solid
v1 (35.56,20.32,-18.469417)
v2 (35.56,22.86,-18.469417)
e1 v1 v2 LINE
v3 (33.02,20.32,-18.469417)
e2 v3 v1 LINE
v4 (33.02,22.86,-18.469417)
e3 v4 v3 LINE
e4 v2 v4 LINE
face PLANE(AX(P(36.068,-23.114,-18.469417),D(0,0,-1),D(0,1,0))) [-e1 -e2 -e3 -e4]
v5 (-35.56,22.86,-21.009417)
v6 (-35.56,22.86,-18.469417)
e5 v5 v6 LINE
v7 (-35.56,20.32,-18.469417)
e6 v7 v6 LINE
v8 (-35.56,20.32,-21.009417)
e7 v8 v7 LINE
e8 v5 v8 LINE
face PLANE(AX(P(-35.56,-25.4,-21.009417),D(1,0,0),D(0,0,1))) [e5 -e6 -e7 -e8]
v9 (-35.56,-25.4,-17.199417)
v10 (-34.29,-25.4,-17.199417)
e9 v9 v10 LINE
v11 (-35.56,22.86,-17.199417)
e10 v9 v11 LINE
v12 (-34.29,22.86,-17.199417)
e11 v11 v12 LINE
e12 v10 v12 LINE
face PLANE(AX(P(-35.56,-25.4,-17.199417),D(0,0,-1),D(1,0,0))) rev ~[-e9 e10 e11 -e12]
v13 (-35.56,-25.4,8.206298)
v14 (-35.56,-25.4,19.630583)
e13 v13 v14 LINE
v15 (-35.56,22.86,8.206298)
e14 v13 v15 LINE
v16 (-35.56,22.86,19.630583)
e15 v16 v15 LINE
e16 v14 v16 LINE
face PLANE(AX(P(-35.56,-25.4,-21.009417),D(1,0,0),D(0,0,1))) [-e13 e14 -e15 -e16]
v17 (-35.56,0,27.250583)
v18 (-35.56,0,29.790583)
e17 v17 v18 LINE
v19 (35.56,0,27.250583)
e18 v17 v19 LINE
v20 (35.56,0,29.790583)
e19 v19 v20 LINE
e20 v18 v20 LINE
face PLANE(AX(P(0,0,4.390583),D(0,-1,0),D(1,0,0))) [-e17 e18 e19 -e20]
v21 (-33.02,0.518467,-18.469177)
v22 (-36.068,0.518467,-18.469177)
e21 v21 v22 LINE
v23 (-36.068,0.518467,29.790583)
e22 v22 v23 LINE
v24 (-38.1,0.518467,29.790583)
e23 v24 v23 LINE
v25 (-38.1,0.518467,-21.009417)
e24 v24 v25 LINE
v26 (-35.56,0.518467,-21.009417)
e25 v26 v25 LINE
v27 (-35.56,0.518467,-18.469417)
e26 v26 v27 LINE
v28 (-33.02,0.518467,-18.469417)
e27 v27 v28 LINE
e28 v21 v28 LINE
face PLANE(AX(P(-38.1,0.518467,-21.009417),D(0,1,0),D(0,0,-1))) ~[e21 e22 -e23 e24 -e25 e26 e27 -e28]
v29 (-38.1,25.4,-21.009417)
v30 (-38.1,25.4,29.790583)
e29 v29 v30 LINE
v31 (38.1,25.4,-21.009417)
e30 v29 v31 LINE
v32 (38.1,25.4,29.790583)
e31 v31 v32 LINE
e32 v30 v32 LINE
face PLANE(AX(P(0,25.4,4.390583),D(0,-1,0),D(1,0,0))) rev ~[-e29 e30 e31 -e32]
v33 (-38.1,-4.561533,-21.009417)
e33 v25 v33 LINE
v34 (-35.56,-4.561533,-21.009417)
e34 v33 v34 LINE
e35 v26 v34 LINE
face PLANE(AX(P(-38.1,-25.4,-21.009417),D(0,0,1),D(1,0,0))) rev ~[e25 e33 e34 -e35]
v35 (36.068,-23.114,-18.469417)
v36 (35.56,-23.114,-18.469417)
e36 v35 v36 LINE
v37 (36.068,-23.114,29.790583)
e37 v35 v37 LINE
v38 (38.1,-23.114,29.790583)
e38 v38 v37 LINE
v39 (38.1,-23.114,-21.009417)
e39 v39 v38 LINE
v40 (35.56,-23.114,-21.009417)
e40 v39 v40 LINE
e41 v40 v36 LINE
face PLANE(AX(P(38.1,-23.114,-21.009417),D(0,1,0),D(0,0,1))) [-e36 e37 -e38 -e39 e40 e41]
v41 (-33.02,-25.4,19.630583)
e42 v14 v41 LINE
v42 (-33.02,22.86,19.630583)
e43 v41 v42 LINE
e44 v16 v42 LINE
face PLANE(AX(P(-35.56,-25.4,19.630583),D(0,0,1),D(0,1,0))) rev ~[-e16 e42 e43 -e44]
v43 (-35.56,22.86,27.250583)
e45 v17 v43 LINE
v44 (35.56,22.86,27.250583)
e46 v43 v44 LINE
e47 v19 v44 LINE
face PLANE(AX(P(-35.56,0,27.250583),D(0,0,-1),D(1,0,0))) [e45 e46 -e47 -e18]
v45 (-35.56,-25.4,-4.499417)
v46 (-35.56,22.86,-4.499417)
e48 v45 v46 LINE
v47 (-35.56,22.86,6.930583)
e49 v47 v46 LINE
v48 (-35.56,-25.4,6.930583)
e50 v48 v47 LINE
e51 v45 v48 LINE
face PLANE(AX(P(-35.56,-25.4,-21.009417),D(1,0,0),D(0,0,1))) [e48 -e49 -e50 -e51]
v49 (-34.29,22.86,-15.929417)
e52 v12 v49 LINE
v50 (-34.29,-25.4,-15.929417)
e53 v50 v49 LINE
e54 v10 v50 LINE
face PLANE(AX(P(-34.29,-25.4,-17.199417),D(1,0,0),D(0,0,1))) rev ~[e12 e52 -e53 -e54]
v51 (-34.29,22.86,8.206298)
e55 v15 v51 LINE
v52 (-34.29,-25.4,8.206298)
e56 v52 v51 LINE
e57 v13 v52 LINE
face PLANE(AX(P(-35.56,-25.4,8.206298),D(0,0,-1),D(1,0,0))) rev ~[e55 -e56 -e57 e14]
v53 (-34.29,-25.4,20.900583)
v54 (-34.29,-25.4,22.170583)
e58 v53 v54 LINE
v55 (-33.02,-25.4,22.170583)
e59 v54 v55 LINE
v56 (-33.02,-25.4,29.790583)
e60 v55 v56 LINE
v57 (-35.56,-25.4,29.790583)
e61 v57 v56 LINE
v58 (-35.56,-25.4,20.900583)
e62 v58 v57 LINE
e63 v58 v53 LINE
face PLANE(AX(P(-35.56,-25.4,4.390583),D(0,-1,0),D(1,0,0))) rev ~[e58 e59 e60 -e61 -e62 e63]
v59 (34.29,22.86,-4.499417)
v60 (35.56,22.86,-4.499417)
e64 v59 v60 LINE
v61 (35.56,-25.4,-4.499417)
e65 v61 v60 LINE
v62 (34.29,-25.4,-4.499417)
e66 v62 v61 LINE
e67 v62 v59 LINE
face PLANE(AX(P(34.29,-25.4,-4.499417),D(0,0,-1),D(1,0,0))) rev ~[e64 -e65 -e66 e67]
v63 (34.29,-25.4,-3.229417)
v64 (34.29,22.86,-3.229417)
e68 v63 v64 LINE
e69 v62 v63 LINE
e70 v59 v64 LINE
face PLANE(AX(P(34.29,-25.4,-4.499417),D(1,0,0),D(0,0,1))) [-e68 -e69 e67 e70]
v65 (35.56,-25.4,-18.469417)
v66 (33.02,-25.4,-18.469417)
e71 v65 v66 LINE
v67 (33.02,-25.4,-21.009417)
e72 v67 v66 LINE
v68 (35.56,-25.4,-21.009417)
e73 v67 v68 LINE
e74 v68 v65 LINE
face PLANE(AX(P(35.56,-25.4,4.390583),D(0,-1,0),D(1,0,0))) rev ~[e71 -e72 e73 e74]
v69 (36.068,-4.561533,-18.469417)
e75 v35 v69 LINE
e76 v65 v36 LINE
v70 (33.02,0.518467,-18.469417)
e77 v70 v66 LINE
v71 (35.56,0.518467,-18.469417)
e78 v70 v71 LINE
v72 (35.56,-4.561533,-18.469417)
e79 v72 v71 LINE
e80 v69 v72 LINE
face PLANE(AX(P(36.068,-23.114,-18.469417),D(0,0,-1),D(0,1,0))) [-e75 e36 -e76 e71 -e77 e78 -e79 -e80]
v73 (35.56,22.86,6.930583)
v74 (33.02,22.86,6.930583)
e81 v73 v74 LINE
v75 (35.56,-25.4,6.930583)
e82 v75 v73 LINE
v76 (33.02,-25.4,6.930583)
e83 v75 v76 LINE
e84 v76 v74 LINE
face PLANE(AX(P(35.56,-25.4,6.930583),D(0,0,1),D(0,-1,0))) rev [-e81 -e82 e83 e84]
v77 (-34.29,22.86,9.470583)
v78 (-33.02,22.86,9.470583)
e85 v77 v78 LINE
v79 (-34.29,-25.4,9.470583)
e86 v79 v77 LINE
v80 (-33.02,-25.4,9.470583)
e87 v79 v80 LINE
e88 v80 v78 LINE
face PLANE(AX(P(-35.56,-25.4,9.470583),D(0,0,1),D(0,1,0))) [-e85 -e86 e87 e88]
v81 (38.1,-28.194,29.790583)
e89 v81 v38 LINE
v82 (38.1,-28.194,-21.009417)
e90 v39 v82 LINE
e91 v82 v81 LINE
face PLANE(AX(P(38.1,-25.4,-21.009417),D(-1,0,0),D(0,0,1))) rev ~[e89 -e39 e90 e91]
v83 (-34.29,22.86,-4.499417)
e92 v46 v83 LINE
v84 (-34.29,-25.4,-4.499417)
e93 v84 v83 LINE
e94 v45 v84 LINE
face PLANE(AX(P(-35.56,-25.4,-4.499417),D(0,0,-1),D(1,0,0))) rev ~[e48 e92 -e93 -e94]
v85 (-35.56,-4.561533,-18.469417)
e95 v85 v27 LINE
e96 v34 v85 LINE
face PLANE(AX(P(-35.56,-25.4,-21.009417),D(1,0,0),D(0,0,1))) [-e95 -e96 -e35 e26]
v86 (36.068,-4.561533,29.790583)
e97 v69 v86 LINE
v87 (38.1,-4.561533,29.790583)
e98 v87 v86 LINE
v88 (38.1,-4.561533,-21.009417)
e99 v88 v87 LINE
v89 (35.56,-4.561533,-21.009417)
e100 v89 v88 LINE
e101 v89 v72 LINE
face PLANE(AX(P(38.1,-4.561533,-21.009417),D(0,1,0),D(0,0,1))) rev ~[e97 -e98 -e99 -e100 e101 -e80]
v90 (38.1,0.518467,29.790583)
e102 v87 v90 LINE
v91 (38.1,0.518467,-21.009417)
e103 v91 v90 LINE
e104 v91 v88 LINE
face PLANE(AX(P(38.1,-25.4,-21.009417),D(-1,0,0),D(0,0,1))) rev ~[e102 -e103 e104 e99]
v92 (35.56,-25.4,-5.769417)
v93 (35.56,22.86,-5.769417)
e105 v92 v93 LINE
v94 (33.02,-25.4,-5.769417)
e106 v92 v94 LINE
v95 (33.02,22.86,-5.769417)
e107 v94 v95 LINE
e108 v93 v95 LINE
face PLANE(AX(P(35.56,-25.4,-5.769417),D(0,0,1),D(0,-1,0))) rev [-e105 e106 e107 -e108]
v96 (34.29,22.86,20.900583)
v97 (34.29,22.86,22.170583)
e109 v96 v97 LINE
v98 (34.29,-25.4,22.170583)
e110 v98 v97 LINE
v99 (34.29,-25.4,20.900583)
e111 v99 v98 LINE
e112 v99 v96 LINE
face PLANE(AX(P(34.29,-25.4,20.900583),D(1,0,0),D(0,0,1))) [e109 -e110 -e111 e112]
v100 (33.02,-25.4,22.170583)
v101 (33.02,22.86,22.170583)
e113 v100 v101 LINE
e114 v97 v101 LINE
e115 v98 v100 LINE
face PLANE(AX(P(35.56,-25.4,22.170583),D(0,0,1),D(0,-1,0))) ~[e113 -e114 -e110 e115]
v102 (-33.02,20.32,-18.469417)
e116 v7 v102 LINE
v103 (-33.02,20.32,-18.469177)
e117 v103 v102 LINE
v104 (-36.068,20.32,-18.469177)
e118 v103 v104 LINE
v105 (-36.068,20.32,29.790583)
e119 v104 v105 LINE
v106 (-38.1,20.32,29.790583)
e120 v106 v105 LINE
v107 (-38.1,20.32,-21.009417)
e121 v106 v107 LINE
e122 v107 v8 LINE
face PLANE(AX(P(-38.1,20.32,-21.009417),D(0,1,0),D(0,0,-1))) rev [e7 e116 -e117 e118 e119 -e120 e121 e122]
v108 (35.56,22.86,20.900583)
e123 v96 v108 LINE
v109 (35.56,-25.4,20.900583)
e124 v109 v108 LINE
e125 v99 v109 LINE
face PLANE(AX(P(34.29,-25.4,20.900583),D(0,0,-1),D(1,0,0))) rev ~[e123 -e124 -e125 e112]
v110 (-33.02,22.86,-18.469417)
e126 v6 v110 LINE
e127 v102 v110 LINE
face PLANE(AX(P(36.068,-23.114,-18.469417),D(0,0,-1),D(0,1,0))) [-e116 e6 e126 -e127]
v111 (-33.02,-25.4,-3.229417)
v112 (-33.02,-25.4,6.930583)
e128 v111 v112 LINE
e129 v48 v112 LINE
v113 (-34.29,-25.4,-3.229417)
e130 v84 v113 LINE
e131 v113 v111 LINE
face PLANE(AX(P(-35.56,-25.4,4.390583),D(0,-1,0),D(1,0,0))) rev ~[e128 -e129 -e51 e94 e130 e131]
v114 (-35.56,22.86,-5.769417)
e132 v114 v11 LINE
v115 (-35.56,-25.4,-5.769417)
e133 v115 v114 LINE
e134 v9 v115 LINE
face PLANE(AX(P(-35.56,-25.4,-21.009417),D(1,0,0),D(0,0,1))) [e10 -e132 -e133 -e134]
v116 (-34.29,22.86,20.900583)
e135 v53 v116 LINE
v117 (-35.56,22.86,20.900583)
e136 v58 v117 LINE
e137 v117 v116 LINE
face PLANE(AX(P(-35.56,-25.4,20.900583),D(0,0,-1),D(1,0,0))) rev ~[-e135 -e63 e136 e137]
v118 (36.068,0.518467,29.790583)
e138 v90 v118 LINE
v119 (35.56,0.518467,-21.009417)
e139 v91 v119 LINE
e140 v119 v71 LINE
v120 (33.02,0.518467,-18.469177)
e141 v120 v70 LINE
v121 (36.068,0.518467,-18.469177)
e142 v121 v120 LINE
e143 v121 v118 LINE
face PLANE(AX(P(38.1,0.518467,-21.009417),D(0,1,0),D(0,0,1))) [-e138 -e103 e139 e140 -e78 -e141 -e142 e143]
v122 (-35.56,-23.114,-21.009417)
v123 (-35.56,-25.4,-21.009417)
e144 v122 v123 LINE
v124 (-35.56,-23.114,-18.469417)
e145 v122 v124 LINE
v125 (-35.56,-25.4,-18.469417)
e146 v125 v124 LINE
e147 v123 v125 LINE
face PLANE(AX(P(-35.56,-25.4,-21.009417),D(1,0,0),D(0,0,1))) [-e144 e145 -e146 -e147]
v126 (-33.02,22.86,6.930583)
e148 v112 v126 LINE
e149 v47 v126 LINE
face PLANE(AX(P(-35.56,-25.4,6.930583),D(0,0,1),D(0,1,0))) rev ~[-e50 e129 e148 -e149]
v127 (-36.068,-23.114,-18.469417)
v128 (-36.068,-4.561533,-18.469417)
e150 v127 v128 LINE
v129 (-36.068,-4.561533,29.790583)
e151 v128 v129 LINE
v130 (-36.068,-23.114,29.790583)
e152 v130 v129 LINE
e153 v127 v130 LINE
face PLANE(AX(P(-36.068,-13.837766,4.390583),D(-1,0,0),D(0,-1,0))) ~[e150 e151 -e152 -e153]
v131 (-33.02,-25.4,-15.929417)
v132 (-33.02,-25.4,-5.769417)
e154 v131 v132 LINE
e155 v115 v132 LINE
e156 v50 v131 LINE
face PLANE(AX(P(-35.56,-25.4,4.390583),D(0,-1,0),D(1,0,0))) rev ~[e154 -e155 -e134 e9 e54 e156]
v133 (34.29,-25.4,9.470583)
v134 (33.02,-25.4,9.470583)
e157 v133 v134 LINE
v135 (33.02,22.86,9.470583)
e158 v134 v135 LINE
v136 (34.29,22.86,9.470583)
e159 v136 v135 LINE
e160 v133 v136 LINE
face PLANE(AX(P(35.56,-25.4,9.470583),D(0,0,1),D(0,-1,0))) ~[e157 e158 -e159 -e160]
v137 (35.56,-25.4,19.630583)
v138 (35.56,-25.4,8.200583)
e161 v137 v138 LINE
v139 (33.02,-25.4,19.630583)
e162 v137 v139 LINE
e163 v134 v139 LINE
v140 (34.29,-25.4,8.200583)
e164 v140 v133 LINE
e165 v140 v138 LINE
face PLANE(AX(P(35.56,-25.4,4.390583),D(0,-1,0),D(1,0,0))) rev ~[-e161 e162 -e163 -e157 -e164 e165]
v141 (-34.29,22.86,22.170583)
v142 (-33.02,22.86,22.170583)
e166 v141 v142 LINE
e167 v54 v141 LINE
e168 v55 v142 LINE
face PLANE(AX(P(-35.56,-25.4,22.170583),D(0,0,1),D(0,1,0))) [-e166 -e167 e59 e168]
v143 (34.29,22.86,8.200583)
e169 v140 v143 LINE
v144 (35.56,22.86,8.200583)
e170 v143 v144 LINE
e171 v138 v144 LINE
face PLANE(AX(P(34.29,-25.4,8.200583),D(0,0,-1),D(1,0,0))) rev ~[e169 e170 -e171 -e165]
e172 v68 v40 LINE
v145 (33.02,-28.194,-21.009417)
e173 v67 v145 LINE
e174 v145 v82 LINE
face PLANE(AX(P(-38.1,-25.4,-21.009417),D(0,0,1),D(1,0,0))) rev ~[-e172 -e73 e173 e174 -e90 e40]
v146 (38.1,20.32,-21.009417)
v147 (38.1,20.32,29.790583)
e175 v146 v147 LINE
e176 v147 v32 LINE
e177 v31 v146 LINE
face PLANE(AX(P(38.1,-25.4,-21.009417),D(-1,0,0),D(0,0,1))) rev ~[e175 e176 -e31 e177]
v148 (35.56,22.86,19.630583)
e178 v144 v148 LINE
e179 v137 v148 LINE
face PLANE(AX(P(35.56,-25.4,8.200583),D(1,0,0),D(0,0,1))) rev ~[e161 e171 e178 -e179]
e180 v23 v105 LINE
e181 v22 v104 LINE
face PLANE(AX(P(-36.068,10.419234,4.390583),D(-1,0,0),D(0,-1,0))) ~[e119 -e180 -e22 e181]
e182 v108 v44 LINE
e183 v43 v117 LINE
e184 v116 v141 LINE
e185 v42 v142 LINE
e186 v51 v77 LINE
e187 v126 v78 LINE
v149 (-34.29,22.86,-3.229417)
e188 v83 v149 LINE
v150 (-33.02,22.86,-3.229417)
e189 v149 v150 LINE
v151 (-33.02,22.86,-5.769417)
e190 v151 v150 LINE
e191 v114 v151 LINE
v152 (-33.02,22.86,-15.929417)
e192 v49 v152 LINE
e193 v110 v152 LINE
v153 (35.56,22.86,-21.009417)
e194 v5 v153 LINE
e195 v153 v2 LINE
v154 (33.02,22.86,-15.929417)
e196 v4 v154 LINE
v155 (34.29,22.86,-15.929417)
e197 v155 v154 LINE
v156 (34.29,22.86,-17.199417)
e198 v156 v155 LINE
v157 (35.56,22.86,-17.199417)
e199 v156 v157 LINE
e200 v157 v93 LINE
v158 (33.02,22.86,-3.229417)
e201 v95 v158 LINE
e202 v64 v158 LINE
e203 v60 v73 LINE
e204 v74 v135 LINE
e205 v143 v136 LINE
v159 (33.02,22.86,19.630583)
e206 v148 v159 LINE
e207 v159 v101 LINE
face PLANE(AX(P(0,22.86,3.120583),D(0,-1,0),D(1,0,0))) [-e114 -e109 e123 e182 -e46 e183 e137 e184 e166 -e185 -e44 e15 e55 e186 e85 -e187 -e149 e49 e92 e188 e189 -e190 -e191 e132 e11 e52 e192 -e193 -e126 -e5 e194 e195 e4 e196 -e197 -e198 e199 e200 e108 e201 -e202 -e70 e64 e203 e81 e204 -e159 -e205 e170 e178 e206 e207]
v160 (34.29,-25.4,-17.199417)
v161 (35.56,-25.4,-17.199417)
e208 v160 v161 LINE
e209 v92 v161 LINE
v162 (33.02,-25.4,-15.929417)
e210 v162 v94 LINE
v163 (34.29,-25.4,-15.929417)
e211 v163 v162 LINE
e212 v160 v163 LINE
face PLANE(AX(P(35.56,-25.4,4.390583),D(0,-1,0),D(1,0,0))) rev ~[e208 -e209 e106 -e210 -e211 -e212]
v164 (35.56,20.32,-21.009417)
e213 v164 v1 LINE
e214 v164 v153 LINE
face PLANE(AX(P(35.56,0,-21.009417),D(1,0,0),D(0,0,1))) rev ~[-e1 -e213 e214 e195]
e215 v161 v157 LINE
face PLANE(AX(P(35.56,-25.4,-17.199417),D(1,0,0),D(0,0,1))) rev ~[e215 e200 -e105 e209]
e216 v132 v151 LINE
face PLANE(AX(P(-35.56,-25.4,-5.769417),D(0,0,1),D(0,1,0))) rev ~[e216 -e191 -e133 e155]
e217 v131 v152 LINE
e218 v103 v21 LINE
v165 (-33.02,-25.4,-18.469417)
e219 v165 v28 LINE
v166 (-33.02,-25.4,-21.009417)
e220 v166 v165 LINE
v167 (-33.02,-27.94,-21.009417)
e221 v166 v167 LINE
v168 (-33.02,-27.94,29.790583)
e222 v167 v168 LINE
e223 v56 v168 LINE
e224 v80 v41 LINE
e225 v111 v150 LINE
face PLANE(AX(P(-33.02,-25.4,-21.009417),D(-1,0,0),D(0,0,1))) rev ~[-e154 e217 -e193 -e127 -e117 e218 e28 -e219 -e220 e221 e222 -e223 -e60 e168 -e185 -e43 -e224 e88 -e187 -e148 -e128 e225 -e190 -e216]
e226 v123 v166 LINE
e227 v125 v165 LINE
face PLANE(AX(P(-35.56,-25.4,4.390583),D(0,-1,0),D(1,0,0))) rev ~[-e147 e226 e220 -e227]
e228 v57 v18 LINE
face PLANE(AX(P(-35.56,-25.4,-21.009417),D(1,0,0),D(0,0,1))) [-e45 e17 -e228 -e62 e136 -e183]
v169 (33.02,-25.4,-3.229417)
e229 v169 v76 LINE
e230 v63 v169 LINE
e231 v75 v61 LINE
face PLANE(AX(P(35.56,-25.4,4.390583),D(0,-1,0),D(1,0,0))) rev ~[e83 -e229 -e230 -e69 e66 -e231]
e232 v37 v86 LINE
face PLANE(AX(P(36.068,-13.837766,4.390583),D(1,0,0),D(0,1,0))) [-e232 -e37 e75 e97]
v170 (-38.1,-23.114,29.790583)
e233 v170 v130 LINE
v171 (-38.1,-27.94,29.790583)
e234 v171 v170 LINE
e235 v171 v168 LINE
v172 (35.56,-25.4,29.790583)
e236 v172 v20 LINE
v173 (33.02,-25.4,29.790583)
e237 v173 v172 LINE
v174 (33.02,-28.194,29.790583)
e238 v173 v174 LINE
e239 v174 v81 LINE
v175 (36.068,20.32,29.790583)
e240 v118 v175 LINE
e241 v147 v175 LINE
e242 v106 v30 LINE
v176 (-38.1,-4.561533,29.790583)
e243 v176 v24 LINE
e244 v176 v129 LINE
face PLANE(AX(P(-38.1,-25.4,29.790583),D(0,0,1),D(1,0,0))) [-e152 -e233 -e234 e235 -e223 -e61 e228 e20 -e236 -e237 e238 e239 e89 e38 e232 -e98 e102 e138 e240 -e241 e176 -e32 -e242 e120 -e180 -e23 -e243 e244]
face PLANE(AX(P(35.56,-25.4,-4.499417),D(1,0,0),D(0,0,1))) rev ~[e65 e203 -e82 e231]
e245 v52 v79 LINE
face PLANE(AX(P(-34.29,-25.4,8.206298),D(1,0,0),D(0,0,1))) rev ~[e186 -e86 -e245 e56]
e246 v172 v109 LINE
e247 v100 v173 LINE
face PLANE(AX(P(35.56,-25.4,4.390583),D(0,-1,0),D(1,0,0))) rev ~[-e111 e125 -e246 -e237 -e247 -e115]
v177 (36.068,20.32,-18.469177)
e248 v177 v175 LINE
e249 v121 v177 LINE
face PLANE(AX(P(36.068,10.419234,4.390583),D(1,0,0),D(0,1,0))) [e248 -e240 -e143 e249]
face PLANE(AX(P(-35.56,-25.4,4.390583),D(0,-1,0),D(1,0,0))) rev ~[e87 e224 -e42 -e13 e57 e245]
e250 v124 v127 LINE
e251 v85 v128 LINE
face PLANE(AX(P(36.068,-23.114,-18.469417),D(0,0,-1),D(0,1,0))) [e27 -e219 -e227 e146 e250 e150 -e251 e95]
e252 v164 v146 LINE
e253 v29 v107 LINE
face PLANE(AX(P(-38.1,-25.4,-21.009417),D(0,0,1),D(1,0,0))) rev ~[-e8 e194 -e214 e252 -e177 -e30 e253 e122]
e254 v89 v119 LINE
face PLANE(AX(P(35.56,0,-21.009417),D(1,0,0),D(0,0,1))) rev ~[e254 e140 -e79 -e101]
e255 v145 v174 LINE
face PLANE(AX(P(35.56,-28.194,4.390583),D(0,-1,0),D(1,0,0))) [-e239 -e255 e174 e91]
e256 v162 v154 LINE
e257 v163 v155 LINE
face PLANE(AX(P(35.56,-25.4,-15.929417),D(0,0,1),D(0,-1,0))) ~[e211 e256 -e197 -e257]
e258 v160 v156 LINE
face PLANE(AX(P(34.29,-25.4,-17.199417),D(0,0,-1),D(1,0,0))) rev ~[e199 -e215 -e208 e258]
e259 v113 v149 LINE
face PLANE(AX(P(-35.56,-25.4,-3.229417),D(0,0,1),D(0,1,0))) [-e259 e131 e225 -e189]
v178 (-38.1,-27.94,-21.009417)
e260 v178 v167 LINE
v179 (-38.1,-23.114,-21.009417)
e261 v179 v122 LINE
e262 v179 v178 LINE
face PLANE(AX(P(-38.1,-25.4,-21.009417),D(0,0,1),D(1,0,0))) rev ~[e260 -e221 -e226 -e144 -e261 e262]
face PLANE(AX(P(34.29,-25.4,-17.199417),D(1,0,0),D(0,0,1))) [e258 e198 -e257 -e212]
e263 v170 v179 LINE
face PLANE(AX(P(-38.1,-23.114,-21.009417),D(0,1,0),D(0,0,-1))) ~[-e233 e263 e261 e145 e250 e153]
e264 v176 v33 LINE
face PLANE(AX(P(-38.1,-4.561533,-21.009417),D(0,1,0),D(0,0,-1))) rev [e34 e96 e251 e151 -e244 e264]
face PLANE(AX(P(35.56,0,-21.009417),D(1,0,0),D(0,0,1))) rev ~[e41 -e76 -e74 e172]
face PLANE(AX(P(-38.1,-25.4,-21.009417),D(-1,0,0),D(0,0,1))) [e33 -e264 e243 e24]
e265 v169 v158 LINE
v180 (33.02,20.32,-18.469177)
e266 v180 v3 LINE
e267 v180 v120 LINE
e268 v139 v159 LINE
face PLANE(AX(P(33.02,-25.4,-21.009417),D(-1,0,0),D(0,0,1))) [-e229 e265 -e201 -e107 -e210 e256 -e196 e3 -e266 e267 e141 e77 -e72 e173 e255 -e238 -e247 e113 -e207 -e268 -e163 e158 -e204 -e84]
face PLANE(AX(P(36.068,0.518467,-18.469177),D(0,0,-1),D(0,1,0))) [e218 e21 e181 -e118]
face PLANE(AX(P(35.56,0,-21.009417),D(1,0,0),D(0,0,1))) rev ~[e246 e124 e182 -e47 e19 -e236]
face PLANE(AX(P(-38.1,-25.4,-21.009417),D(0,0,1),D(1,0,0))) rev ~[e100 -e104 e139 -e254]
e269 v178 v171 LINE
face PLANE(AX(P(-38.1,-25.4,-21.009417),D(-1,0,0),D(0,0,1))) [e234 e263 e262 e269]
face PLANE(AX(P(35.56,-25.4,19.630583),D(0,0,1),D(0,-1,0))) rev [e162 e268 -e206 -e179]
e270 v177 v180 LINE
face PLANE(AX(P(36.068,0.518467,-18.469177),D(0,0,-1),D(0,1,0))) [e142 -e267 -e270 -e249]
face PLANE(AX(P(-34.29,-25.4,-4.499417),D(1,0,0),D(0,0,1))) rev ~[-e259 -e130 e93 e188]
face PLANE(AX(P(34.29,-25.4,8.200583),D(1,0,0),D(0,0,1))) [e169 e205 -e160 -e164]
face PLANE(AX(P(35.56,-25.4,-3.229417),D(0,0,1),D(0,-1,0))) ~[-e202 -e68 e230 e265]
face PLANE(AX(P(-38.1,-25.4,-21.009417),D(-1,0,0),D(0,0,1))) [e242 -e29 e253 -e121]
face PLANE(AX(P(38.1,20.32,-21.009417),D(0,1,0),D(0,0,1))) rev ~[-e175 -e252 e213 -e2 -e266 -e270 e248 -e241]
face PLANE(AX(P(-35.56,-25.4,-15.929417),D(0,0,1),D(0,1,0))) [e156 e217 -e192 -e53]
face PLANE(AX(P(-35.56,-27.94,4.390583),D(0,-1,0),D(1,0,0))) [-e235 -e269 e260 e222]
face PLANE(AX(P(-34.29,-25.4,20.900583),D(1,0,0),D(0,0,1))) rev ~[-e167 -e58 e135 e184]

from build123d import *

# Parameters (mm, degrees)
F0_W          = 76.2
F0_H          = 50.8
F1_DEPTH      = 25.4
F1_DEPTH_BACK = 25.4
F2_W          = 71.12
F2_H          = 50.8
F3_DEPTH      = 25.4
F4_W          = 71.12
F4_H          = 48.26
F5_DEPTH      = 22.86
F6_W          = 48.26
F6_H          = 2.54
F7_DEPTH      = 2.54
F8_W          = 48.26
F8_H          = 2.54
F9_DEPTH      = 2.54
F10_W         = 48.26
F10_H         = 2.54
F11_DEPTH     = 2.54
F12_W         = 48.26
F12_H         = 2.54
F13_DEPTH     = 2.54
F15_W         = 1.27
F15_H         = 1.27
F16_DEPTH     = 48.26
F17_W         = 1.27
F17_H         = 1.27
F18_DEPTH     = 48.26
F19_W         = 1.27
F19_H         = 1.2642855102
F20_DEPTH     = 48.26
F21_W         = 1.27
F21_H         = 1.27
F22_DEPTH     = 48.26
F23_W         = 1.27
F23_H         = 1.27
F24_DEPTH     = 48.26
F25_W         = 1.27
F25_H         = 1.27
F26_DEPTH     = 48.26
F27_W         = 1.27
F27_H         = 1.27
F28_DEPTH     = 48.26
F29_W         = 1.27
F29_H         = 1.27
F30_DEPTH     = 48.26
F31_W         = 5.08
F31_H         = 50.8
F32_DEPTH     = 2.794
F33_W         = 5.08
F33_H         = 50.8
F34_DEPTH     = 2.54
F35_W         = 18.5524672455
F35_H         = 50.8
F35_W_2       = 19.8015327545
F36_DEPTH     = 2.032
F37_W         = 18.5524672455
F37_H         = 2.54
F38_DEPTH     = 74.169
F39_W         = 19.8015327545
F39_H         = 2.5402396598
F40_DEPTH     = 74.169


# Not quite as in the source:
# - a pattern or mirror of a feature is missing from the dataset's text; its kind, count and spacing are read off the source's solid


with BuildPart() as f1:
    # F0 (on Front) → F1 (new body, two sides)
    with BuildSketch(Plane.XZ) as f1_sk:
        with Locations((0, 4.3905831537)):
            Rectangle(F0_W, F0_H)
    extrude(amount=F1_DEPTH)
    extrude(f1_sk.sketch, amount=-F1_DEPTH_BACK)

    # F2 (on face) → F3 (cut)
    with BuildSketch(Plane.XZ.offset(25.4)):
        with Locations((0, 4.3905831537)):
            Rectangle(F2_W, F2_H)
    extrude(amount=-F3_DEPTH, mode=Mode.SUBTRACT)

    # F4 (on face) → F5 (cut)
    with BuildSketch(Plane.XZ):
        with Locations((0, 3.1205831537)):
            Rectangle(F4_W, F4_H)
    extrude(amount=-F5_DEPTH, mode=Mode.SUBTRACT)

    # F6 (on face) → F7 (join)
    with BuildSketch(Plane.YZ.offset(-35.56)):
        with Locations((-1.27, -17.1994168463)):
            Rectangle(F6_W, F6_H)
    extrude(amount=F7_DEPTH)

    # F8 (on face) → F9 (join)
    with BuildSketch(Plane.YZ.offset(-35.56)):
        with Locations((-1.27, -4.4994168463)):
            Rectangle(F8_W, F8_H)
    extrude(amount=F9_DEPTH)

    # F10 (on face) → F11 (join)
    with BuildSketch(Plane.YZ.offset(-35.56)):
        with Locations((-1.27, 8.2005831537)):
            Rectangle(F10_W, F10_H)
    extrude(amount=F11_DEPTH)

    # F12 (on face) → F13 (join)
    with BuildSketch(Plane.YZ.offset(-35.56)):
        with Locations((-1.27, 20.9005831537)):
            Rectangle(F12_W, F12_H)
    extrude(amount=F13_DEPTH)

    # F14: F1 across plane


with BuildPart() as f1_1:
    add(f1.part)
    add(f1.part.mirror(Plane.YZ))

    # F15 (on face) → F16 (cut)
    with BuildSketch(Plane.XZ.offset(25.4)):
        with Locations((-34.925, -16.5644168463)):
            Rectangle(F15_W, F15_H)
    extrude(amount=-F16_DEPTH, mode=Mode.SUBTRACT)

    # F17 (on face) → F18 (cut)
    with BuildSketch(Plane.XZ.offset(25.4)):
        with Locations((-34.925, -3.8644168463)):
            Rectangle(F17_W, F17_H)
    extrude(amount=-F18_DEPTH, mode=Mode.SUBTRACT)

    # F19 (on face) → F20 (cut)
    with BuildSketch(Plane.XZ.offset(25.4)):
        with Locations((-34.925, 8.8384403986)):
            Rectangle(F19_W, F19_H)
    extrude(amount=-F20_DEPTH, mode=Mode.SUBTRACT)

    # F21 (on face) → F22 (cut)
    with BuildSketch(Plane.XZ.offset(25.4)):
        with Locations((-34.925, 21.5355831537)):
            Rectangle(F21_W, F21_H)
    extrude(amount=-F22_DEPTH, mode=Mode.SUBTRACT)

    # F23 (on face) → F24 (cut)
    with BuildSketch(Plane.XZ.offset(25.4)):
        with Locations((34.925, 21.5355831537)):
            Rectangle(F23_W, F23_H)
    extrude(amount=-F24_DEPTH, mode=Mode.SUBTRACT)

    # F25 (on face) → F26 (cut)
    with BuildSketch(Plane.XZ.offset(25.4)):
        with Locations((34.925, 8.8355831537)):
            Rectangle(F25_W, F25_H)
    extrude(amount=-F26_DEPTH, mode=Mode.SUBTRACT)

    # F27 (on face) → F28 (cut)
    with BuildSketch(Plane.XZ.offset(25.4)):
        with Locations((34.925, -3.8644168463)):
            Rectangle(F27_W, F27_H)
    extrude(amount=-F28_DEPTH, mode=Mode.SUBTRACT)

    # F29 (on face) → F30 (cut)
    with BuildSketch(Plane.XZ.offset(25.4)):
        with Locations((34.925, -16.5644168463)):
            Rectangle(F29_W, F29_H)
    extrude(amount=-F30_DEPTH, mode=Mode.SUBTRACT)

    # F31 (on face) → F32 (join)
    with BuildSketch(Plane.XZ.offset(25.4)):
        with Locations((35.56, 4.3905831537)):
            Rectangle(F31_W, F31_H)
    extrude(amount=F32_DEPTH)

    # F33 (on face) → F34 (join)
    with BuildSketch(Plane.XZ.offset(25.4)):
        with Locations((-35.56, 4.3905831537)):
            Rectangle(F33_W, F33_H)
    extrude(amount=F34_DEPTH)

    # F35 (on face) → F36 (cut)
    with BuildSketch(Plane.YZ.offset(38.1)):
        with Locations((-13.8377663772, 4.3905831537)):
            Rectangle(F35_W, F35_H)
        with Locations((10.4192336228, 4.3905831537)):
            Rectangle(F35_W_2, F35_H)
    f36 = extrude(amount=-F36_DEPTH, mode=Mode.SUBTRACT)

    # F36_copies: F36 across plane
    add(f36.mirror(Plane(origin=(0, 0, 0), x_dir=(0, 0, -1), z_dir=(-1, 0, 0))), mode=Mode.SUBTRACT)

    # F37 (on face) → F38 (cut, through all)
    with BuildSketch(Plane.YZ.offset(36.068)):
        with Locations((-13.8377663772, -19.7394168463)):
            Rectangle(F37_W, F37_H)
    extrude(amount=-F38_DEPTH, mode=Mode.SUBTRACT)

    # F39 (on face) → F40 (cut, through all)
    with BuildSketch(Plane.YZ.offset(36.068)):
        with Locations((10.4192336228, -19.7392970164)):
            Rectangle(F39_W, F39_H)
    extrude(amount=-F40_DEPTH, mode=Mode.SUBTRACT)


solid = f1_1.part
